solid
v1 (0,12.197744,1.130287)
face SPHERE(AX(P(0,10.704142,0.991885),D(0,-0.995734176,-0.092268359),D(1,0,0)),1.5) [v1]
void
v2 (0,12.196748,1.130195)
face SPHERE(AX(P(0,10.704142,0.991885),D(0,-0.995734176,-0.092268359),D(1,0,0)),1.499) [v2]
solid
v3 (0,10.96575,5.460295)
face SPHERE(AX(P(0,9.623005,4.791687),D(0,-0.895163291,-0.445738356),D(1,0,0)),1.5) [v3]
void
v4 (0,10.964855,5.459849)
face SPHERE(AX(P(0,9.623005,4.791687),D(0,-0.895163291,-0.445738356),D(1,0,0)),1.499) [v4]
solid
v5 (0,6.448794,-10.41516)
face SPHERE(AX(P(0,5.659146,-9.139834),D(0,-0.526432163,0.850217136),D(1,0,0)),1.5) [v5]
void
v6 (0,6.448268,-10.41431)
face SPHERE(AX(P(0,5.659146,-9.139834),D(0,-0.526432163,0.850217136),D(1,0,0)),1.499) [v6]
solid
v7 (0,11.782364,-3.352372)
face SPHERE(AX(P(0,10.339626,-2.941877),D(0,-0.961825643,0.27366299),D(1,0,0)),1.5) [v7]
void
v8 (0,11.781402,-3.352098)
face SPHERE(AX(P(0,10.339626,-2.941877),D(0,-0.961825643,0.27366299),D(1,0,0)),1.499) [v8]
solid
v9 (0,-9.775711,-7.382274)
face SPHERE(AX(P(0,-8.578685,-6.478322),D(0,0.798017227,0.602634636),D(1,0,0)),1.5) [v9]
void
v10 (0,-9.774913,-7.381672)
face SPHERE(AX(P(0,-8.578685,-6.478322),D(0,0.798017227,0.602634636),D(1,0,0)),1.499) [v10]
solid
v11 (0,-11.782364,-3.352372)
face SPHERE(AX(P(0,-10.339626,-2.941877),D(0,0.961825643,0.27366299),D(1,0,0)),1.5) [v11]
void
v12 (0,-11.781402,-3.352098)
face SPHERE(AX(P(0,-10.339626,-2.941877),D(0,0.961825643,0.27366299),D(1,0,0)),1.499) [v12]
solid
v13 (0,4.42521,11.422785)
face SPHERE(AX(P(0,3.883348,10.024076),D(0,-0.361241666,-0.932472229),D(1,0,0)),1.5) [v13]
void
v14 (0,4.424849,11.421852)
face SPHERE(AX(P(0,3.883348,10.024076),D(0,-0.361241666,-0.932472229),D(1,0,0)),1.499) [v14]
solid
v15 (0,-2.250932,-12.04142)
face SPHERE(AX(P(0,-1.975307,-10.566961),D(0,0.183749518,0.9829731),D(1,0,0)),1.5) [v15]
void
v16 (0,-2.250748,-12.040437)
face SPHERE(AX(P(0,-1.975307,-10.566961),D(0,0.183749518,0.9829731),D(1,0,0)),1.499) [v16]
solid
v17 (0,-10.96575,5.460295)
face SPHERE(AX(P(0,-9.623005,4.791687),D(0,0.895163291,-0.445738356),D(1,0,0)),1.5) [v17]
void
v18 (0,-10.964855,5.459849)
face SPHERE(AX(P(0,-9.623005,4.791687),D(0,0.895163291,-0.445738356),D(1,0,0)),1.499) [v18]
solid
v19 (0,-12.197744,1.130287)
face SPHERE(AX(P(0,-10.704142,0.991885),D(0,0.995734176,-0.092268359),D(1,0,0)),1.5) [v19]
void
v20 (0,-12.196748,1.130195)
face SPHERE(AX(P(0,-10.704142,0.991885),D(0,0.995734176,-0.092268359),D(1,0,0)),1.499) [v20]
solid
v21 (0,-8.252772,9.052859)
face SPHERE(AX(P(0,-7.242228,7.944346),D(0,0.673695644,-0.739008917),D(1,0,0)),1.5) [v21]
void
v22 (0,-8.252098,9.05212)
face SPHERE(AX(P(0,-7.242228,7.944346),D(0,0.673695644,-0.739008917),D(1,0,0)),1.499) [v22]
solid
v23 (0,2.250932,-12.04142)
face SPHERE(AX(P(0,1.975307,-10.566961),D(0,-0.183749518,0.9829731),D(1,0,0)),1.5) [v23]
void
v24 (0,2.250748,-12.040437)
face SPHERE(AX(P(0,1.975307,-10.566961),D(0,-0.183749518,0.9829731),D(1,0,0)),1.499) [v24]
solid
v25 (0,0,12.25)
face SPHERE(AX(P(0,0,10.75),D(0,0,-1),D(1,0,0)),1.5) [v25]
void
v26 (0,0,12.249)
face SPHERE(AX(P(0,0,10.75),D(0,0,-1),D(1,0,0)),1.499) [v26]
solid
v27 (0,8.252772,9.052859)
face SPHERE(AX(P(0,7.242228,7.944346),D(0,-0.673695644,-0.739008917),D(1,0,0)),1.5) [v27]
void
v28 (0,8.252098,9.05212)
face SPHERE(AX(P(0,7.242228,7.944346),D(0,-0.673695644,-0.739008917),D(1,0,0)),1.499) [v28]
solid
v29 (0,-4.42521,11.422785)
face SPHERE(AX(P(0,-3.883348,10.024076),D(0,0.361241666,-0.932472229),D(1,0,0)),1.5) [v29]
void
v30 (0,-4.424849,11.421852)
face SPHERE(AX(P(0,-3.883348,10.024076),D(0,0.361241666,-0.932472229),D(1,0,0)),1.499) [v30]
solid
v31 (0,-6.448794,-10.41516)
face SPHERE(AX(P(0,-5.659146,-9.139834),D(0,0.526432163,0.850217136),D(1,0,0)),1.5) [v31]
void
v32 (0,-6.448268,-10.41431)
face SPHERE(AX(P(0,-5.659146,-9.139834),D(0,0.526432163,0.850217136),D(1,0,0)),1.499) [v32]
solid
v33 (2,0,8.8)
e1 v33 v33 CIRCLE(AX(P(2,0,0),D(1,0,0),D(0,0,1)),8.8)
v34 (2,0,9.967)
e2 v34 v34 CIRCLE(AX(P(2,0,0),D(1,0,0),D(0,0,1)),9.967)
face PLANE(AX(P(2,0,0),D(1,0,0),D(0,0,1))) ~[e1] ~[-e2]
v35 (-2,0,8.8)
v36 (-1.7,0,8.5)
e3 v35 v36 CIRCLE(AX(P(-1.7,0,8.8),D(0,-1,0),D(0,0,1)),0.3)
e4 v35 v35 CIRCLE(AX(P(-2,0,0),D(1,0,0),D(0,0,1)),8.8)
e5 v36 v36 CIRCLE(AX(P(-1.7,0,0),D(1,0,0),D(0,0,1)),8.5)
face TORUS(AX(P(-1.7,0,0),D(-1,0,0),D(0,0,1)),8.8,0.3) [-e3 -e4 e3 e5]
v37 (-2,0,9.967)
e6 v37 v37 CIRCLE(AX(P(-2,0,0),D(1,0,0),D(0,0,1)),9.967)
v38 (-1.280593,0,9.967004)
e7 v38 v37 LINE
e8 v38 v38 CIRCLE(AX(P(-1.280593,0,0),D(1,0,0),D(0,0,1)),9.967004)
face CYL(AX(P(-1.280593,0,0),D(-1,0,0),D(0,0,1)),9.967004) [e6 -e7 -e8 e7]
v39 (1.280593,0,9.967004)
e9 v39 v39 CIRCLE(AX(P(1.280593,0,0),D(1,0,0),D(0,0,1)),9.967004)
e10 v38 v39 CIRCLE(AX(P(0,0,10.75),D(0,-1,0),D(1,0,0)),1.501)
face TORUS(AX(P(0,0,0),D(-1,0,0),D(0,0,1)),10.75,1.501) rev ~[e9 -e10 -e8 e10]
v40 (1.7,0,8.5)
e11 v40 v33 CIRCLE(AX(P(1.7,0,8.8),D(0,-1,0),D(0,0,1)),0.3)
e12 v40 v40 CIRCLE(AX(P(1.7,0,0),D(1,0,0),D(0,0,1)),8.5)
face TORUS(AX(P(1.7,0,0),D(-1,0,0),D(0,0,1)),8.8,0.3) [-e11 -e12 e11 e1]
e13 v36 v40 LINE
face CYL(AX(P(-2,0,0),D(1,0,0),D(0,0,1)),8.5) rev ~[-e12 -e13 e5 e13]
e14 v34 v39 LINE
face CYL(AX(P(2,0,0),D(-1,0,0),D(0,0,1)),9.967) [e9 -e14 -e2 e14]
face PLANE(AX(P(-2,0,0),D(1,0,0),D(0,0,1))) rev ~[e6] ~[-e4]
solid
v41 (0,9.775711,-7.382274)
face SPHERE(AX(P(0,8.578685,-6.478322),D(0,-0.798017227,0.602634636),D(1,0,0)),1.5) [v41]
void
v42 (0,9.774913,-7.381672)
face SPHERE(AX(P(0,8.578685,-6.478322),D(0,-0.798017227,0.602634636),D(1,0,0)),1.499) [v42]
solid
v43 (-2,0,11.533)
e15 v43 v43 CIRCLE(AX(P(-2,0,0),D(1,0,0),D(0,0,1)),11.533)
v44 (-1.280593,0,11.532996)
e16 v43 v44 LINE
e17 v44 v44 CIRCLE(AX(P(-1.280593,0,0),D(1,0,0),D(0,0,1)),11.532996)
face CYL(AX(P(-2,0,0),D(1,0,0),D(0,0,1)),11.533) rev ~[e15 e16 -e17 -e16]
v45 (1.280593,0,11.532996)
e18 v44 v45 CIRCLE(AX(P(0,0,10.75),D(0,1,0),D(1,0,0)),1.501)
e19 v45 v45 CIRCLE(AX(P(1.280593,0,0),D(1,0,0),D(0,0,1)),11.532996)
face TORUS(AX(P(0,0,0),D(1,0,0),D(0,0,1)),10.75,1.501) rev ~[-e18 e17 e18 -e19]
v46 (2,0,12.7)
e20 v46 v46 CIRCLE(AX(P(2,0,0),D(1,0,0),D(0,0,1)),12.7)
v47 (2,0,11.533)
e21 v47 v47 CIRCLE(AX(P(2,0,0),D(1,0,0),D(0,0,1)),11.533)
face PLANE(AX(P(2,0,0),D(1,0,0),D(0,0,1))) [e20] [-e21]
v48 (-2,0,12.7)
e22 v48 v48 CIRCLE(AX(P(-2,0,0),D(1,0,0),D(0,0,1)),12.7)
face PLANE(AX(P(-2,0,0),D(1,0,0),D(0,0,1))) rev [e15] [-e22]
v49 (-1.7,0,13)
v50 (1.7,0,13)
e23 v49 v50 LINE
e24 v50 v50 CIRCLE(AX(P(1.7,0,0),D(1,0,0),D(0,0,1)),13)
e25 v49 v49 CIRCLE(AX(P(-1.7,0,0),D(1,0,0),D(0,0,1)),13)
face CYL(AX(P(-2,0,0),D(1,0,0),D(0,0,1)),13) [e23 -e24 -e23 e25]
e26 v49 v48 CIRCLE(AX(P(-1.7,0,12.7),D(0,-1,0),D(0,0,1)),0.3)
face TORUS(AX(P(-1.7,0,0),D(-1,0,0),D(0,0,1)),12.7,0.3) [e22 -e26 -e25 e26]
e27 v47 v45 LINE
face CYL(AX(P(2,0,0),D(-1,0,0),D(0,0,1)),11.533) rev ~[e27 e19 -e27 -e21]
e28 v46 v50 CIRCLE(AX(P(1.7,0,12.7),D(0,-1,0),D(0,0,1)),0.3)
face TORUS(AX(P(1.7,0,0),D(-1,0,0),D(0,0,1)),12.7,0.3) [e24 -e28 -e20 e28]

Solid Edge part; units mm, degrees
sketch "Sketch1" plane through (0, 0, 0) normal (0, -1, 0) x (1, 0, 0)
  arc A0 (0, 12.25) -> (0, 9.25) centre (0, 10.75) cw
  dimension "D1" = 1.5
revolve "RevolvedProtrusion1" add sketch "Sketch1" angle 360 about axis through (0, 0, 30.6346) along (0, 0, 1)
shell "Thinwall1" thickness 0.001 removed faces 0
pattern_circular "Pattern1" count 17 over 360 about axis through (0, 0, 0) along (1, 0, 0) of "RevolvedProtrusion1", "Thinwall1"
sketch "Sketch2" plane through (0, 0, 0) normal (0, -1, 0) x (1, 0, 0)
  line L0 (-2, 9.967) -> (-2, 8.5)
  line L1 (-2, 8.5) -> (2, 8.5)
  line L2 (2, 8.5) -> (2, 9.967)
  line L3 (2, 9.967) -> (1.2806, 9.967)
  arc A0 (-1.2806, 9.967) -> (1.2806, 9.967) centre (0, 10.75) ccw
  line L4 (-1.2806, 9.967) -> (-2, 9.967)
  line L5 (-2, 11.533) -> (-1.2806, 11.533)
  arc A1 (-1.2806, 11.533) -> (1.2806, 11.533) centre (0, 10.75) cw
  line L6 (2, 11.533) -> (1.2806, 11.533)
  line L7 (2, 13) -> (2, 11.533)
  line L8 (-2, 13) -> (2, 13)
  line L9 (-2, 11.533) -> (-2, 13)
  dimension "D1" = 1.501
  dimension "D2" = 1.501
  dimension "D3" = 4
revolve "RevolvedProtrusion2" add sketch "Sketch2" angle 360 about axis through (-60, 0, 0) along (1, 0, 0)
fillet "Round1" radius 0.3 4 edges at (-2, 0, -13) (2, 0, -13) (2, 0, -8.5) (-2, 0, -8.5)
properties material "Stahl"
